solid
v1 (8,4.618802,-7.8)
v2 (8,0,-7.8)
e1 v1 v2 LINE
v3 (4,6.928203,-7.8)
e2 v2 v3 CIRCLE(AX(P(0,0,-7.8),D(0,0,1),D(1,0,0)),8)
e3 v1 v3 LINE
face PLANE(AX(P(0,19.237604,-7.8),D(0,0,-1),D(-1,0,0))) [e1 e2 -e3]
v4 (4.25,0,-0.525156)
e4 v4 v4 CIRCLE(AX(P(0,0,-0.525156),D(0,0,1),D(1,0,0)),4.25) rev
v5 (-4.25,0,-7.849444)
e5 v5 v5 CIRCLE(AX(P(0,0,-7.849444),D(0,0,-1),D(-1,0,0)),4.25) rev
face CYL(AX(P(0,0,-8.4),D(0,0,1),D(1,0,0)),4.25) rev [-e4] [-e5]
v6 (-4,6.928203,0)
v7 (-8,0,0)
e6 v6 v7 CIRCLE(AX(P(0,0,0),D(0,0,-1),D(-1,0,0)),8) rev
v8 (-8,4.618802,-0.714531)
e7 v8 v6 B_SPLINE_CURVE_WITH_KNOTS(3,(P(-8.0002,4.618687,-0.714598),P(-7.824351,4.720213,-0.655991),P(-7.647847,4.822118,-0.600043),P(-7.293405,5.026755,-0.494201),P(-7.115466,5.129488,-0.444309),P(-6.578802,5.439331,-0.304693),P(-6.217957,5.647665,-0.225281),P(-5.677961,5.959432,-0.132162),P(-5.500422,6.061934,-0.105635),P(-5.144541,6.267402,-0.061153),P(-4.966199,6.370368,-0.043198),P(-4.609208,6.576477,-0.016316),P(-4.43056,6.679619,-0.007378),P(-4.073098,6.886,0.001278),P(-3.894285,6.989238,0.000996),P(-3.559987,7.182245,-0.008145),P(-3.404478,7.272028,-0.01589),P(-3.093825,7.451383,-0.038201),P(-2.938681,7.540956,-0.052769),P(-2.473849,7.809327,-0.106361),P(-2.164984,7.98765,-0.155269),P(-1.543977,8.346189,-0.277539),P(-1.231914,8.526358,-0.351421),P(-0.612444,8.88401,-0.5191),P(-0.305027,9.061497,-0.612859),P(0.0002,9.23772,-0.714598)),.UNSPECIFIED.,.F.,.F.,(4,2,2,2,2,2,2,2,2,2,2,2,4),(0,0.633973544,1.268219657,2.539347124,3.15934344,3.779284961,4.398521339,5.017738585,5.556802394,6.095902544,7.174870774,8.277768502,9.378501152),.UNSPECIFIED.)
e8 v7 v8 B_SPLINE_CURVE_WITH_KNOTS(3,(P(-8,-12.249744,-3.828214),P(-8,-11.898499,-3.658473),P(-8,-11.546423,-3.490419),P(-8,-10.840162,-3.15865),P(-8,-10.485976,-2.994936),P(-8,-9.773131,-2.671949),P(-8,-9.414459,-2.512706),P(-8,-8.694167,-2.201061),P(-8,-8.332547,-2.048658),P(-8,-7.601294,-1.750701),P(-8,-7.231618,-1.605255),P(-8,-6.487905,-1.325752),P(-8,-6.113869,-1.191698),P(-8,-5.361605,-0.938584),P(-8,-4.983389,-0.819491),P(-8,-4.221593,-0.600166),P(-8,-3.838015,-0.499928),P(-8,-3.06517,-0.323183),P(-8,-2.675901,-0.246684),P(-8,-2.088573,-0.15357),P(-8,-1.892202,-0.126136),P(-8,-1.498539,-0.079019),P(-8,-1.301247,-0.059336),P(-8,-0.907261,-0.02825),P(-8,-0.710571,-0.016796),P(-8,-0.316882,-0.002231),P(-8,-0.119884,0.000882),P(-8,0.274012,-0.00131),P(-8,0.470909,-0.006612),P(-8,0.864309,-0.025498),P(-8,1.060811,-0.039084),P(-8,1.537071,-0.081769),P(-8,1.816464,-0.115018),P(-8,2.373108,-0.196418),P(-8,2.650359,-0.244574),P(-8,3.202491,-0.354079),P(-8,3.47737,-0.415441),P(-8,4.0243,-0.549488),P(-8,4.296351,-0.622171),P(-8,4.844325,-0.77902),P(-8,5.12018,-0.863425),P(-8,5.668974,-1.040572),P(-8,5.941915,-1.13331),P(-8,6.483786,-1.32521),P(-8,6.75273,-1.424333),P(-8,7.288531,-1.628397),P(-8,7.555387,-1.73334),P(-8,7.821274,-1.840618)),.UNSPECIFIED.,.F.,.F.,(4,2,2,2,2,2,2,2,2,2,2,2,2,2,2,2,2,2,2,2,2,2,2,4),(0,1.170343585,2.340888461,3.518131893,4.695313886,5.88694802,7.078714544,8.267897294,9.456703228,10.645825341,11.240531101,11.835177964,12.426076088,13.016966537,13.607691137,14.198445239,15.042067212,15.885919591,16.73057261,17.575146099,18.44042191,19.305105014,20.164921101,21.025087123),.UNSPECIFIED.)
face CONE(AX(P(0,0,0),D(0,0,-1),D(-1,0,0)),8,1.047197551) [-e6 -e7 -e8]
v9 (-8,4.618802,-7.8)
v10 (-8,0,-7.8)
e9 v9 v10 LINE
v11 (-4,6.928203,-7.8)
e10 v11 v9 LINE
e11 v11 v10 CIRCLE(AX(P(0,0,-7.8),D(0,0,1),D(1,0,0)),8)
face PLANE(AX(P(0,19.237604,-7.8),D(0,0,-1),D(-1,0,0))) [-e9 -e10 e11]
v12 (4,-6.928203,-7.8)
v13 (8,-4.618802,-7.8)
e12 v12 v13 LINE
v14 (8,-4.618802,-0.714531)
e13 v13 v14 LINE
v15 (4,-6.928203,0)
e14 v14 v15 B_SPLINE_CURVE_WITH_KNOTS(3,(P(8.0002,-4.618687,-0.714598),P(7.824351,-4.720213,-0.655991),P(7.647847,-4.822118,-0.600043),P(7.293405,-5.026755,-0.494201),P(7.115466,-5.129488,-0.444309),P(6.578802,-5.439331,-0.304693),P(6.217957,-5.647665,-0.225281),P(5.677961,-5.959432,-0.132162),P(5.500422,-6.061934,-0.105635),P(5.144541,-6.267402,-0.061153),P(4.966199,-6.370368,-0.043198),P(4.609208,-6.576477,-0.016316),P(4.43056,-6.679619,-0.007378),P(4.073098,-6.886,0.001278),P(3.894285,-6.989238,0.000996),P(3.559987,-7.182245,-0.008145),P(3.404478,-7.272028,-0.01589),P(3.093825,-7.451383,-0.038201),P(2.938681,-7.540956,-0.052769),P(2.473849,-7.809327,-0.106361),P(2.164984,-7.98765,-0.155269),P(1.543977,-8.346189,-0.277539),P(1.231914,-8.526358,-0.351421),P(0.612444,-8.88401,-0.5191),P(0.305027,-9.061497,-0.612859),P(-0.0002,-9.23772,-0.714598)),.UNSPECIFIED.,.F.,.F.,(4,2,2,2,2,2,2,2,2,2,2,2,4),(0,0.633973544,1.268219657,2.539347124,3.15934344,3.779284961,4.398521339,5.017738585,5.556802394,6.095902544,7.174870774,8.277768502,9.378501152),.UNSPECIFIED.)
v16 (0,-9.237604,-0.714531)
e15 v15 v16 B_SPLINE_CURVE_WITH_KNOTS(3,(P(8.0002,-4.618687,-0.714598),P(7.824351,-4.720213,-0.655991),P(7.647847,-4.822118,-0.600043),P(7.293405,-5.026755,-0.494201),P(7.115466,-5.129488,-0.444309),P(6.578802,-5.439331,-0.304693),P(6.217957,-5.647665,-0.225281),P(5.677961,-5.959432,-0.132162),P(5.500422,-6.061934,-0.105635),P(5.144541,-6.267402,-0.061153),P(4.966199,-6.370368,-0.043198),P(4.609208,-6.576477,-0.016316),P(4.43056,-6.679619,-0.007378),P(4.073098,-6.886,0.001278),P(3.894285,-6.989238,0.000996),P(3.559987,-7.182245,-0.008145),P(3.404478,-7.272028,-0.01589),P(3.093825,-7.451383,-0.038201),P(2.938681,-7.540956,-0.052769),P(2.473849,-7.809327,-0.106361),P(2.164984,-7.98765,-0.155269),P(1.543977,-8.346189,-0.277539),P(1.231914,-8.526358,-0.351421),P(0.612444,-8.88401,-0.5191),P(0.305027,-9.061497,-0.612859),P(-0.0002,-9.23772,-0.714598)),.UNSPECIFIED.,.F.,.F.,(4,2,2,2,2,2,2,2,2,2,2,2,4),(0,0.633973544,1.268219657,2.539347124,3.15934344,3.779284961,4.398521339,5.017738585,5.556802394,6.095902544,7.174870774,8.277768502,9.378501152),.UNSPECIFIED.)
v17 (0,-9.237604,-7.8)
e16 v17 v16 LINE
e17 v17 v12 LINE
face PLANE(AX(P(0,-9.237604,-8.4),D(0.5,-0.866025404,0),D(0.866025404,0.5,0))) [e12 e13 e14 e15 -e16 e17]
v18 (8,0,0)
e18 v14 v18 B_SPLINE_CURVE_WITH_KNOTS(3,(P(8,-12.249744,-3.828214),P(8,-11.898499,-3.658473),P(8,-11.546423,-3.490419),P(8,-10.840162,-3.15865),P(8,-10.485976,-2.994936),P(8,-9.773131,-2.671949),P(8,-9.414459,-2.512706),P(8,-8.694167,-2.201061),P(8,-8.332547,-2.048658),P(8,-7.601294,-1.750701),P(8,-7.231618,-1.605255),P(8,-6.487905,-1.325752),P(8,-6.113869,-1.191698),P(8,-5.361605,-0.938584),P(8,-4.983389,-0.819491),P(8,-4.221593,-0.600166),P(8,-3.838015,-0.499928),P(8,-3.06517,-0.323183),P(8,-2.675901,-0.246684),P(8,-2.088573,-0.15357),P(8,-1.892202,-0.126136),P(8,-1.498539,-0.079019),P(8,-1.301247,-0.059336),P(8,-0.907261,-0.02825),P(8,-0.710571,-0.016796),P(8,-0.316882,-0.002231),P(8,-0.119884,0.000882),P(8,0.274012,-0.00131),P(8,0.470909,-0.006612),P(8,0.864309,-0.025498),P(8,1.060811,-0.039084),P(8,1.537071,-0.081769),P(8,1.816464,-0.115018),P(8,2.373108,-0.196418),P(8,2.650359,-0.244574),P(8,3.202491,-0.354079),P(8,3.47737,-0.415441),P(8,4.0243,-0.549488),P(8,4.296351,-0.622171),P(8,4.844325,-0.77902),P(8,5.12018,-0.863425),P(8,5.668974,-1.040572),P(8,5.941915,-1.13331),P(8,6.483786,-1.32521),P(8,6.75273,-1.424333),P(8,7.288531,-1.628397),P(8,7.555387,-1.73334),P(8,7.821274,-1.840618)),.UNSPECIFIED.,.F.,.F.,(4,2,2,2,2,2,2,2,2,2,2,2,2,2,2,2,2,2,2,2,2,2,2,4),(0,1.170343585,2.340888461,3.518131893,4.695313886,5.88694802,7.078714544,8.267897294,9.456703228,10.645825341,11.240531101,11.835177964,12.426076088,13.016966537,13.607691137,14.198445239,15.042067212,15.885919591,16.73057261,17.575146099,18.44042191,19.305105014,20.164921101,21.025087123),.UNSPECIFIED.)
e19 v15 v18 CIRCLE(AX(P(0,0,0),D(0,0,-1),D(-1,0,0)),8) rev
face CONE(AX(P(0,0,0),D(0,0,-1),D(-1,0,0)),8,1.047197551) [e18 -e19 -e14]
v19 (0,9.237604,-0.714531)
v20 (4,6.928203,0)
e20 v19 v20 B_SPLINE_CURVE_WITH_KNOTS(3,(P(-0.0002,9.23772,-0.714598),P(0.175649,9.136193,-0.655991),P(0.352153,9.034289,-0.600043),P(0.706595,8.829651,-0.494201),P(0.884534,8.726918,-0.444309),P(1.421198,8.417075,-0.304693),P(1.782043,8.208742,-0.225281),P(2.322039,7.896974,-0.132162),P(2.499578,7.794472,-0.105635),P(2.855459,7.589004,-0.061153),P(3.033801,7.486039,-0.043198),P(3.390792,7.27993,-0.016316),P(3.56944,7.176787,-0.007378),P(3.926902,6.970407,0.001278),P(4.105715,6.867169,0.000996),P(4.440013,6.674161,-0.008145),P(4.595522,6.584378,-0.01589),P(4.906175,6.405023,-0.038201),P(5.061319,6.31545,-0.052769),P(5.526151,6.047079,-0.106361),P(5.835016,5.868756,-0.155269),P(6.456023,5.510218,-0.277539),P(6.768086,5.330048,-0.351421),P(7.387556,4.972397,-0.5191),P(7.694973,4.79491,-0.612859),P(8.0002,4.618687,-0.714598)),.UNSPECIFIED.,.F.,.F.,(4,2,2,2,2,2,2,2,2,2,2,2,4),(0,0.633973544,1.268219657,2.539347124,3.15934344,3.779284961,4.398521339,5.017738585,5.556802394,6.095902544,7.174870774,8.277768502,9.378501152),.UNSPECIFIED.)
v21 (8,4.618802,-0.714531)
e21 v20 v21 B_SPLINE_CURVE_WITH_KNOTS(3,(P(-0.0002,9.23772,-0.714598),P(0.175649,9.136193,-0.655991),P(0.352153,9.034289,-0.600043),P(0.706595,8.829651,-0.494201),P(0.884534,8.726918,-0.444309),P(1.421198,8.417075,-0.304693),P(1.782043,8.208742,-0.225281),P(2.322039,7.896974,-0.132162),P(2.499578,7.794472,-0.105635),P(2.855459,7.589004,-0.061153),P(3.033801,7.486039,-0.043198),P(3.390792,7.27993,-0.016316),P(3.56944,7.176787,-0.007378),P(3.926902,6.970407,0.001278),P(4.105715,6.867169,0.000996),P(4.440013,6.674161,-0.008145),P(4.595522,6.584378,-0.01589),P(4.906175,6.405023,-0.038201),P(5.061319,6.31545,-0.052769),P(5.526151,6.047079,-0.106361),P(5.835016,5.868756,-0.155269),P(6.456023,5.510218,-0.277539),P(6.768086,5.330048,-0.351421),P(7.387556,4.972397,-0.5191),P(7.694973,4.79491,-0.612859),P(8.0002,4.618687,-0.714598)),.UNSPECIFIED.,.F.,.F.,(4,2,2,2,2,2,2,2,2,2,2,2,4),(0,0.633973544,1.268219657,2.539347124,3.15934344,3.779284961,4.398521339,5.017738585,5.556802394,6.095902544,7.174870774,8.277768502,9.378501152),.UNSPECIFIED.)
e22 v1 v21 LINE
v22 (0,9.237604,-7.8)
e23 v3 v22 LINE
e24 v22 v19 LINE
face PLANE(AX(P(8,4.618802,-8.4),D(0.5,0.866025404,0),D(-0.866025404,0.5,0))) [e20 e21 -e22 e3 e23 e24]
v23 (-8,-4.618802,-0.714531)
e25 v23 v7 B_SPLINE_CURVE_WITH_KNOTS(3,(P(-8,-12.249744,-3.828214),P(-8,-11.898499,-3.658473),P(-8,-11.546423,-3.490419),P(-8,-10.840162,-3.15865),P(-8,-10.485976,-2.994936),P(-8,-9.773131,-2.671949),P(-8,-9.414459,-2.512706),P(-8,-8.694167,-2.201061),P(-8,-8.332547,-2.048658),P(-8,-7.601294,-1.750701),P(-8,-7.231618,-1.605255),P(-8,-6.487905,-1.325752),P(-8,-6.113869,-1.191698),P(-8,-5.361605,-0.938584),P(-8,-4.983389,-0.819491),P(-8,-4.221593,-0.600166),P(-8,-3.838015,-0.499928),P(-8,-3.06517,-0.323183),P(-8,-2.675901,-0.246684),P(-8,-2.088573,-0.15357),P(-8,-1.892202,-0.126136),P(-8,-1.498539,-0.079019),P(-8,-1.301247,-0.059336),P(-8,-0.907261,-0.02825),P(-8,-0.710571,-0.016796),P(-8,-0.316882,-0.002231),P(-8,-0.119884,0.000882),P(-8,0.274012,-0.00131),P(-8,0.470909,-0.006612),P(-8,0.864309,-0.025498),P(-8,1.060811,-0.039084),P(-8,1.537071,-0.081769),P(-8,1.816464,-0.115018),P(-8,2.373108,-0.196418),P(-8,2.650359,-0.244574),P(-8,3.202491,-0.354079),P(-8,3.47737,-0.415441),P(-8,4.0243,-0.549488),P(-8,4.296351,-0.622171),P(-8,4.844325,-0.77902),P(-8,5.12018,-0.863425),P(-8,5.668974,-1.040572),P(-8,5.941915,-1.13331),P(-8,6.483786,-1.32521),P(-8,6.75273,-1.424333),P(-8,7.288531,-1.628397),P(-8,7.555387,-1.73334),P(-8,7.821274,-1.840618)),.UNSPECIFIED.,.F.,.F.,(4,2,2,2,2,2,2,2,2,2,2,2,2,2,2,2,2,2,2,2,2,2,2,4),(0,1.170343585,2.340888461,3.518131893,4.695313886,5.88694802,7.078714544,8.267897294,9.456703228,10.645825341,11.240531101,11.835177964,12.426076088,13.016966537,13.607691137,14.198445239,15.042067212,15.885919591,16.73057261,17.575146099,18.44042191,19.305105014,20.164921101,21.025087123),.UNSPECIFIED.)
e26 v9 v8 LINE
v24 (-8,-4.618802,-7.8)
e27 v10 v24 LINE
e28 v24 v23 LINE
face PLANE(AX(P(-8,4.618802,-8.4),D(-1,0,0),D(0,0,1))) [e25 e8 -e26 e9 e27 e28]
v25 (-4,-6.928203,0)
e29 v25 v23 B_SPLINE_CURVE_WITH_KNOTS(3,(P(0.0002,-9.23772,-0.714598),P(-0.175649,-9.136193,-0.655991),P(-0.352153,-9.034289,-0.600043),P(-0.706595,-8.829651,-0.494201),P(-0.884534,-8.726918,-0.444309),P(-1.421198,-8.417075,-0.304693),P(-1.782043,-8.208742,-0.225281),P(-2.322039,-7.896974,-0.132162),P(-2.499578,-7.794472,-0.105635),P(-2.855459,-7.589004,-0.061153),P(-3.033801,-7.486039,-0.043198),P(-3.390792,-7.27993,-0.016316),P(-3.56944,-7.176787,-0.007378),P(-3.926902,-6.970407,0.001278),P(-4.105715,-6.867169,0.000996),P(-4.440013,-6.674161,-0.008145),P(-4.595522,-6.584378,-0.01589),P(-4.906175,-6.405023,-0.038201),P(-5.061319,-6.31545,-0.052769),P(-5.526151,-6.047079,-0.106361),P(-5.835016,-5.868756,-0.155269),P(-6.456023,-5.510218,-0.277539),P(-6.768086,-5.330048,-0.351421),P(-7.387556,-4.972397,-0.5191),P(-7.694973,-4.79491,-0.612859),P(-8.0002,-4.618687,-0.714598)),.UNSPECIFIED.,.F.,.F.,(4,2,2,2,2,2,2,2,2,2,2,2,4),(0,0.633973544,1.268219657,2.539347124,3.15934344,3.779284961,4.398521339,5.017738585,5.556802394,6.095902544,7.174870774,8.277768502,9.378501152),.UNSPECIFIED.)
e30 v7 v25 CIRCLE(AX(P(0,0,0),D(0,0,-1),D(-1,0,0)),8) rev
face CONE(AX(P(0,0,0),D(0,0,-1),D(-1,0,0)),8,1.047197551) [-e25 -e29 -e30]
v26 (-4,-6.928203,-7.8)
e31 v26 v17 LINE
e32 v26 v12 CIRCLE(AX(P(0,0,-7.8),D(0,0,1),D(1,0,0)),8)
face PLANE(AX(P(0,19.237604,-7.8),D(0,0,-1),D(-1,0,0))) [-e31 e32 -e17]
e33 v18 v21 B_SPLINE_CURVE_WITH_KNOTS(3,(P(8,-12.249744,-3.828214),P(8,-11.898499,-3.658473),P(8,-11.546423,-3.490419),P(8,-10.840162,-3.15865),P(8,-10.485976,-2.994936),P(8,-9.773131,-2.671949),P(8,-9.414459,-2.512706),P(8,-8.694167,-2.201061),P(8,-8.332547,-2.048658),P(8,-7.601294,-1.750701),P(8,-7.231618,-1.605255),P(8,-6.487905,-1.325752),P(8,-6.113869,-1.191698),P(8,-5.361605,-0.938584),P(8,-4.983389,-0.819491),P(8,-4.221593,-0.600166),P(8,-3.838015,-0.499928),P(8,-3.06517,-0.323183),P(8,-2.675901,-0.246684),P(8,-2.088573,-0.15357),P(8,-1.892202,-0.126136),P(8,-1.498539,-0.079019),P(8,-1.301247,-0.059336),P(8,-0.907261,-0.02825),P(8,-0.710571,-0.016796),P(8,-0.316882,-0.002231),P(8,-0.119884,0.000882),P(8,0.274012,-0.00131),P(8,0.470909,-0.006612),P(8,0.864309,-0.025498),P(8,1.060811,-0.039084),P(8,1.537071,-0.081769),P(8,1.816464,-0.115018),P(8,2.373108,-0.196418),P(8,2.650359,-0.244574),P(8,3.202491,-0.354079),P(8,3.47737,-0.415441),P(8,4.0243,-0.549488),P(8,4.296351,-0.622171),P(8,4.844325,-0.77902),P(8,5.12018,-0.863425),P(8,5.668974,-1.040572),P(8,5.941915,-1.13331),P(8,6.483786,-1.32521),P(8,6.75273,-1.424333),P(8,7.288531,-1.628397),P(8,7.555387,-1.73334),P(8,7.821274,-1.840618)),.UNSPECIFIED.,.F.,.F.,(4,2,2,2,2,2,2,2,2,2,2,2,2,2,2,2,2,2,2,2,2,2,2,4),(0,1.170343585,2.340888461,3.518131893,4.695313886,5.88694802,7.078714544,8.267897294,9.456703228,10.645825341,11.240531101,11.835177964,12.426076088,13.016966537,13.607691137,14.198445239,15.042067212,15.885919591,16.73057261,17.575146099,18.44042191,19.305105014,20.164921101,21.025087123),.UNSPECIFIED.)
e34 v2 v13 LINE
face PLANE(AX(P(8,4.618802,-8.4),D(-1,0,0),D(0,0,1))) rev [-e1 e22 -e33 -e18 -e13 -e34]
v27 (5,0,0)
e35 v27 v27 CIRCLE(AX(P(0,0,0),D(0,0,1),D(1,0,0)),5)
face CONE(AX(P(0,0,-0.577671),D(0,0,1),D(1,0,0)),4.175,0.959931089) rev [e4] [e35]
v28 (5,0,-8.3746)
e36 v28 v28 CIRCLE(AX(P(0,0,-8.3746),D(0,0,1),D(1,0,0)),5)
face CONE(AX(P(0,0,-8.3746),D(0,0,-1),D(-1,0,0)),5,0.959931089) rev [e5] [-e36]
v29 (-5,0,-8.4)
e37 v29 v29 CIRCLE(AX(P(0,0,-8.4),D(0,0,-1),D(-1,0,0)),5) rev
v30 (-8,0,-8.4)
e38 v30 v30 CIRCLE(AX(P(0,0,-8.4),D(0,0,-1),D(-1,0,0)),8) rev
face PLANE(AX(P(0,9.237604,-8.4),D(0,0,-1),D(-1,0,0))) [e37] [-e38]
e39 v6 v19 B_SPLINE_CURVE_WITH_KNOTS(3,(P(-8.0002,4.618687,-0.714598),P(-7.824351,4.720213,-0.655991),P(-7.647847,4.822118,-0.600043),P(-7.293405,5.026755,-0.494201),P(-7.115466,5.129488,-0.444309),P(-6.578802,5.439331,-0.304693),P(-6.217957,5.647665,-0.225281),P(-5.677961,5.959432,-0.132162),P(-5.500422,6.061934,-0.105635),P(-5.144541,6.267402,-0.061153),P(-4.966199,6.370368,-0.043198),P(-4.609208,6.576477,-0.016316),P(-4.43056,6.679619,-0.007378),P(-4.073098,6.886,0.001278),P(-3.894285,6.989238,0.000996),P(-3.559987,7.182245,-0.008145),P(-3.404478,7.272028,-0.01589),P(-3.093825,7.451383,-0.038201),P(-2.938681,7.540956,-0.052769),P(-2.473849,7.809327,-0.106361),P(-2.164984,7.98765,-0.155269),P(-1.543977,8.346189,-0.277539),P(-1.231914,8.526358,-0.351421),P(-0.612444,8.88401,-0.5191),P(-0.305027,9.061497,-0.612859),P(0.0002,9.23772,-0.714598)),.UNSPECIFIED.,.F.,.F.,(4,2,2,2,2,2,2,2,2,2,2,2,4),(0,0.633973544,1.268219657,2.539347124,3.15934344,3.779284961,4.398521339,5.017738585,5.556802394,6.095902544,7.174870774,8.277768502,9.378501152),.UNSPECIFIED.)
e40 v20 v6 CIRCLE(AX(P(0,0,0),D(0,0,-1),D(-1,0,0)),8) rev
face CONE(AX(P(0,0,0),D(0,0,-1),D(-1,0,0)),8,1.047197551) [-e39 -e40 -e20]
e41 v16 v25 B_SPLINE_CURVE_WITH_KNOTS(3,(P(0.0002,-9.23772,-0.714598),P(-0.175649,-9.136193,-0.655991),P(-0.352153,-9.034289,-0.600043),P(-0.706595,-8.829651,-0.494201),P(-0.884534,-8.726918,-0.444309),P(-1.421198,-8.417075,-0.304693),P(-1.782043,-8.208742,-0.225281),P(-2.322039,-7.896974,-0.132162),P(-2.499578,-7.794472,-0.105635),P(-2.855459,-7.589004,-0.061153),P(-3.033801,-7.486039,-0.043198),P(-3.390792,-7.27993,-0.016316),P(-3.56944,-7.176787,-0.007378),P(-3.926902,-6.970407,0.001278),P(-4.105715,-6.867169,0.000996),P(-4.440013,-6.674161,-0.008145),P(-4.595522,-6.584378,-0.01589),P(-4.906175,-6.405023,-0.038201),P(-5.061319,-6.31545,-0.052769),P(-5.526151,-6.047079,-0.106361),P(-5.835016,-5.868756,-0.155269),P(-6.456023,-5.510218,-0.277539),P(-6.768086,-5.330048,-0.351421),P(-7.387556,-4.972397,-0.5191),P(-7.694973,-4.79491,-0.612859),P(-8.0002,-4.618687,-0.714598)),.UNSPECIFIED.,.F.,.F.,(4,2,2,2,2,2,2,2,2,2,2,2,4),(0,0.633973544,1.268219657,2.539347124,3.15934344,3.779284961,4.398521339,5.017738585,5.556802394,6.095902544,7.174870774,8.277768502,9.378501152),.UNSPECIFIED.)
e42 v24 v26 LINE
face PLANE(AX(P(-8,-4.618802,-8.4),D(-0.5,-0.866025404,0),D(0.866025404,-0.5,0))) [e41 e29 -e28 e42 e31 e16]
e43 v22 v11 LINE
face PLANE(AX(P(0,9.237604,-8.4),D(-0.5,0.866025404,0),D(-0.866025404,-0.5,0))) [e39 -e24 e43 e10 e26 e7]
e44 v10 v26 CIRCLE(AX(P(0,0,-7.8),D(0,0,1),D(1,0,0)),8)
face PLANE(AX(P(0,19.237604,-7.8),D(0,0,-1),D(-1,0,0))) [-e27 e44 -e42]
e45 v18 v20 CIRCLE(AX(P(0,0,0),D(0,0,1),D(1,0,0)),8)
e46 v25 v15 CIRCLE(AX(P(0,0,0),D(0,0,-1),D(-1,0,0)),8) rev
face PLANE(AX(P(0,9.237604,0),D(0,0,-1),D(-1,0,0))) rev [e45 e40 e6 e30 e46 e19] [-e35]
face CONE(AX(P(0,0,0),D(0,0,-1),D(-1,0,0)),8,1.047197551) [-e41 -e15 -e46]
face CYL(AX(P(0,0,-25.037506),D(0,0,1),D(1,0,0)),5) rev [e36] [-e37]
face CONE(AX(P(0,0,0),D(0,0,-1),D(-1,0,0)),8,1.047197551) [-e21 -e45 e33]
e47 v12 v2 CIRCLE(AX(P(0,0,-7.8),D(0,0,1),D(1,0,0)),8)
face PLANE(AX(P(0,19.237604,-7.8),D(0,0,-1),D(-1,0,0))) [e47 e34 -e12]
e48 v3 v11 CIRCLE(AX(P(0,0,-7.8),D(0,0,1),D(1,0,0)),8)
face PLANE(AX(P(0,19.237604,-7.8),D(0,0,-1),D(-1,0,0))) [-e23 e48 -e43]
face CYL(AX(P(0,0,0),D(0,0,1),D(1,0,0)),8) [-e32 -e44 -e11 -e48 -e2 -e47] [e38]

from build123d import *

# Parameters (mm, degrees)
BASENUT_START = -8.4
BASENUTSKE_R  = 4.25
BASENUT_DEPTH = 8.4
SKETCH4_W     = 0.6
SKETCH4_H     = 11.237604307


# Read off the part's stored shape, not the designer's step: ThreadSchematic
with BuildPart() as part:
    # BaseNutSke → BaseNut (new body)
    with BuildSketch(Plane.XY.offset(BASENUT_START)):
        Polygon((8, 4.618802154), (8, -4.618802154), (0, -9.237604307), (-8, -4.618802154), (-8, 4.618802154), (0, 9.237604307), align=None)
        Circle(BASENUTSKE_R, mode=Mode.SUBTRACT)
    extrude(amount=BASENUT_DEPTH)

    # Sketch5 (on Front Plane) → EndChamfer (revolve, cut)
    with BuildSketch(Plane.XY):
        Polygon((8.3746, 5), (7.796928781, 4.175), (8.4254, 4.175), (8.4254, 5), align=None)
    revolve(axis=Axis((8.3746, 5, 0), (-0.5735764363510462, -0.8191520442889919, 0)), mode=Mode.SUBTRACT)

    # Sketch4 → Bearing-Face (revolve, cut)
    with BuildSketch(Plane(origin=(0, 0, 0), x_dir=(0, 0, -1), z_dir=(1, 0, 0)), mode=Mode.PRIVATE) as bearing_face_sk:
        with Locations((8.1, 13.618802154)):
            Rectangle(SKETCH4_W, SKETCH4_H)
        Polygon((0, 8), (-10, 8), (-10, 19.237604307), (0.71453118, 19.237604307), (0.71453118, 9.237604307), align=None)
    revolve(bearing_face_sk.sketch.rotate(Axis((0, 0, 0), (0, 0, -1)), 270), axis=Axis((0, 0, 0), (0, 0, -1)), mode=Mode.SUBTRACT)

    # ThreadSchematic outline → ThreadSchematic (revolve, cut)
    with BuildSketch(Plane.XZ):
        Polygon((4.25, 0), (4.25, -0.525155654), (5, 0), align=None)
        Polygon((5, -8.3746), (4.25, -7.849444346), (4.25, -8.4), (5, -8.4), align=None)
    revolve(axis=Axis((0, 0, 0), (0, 0, 1)), mode=Mode.SUBTRACT)


solid = part.part
